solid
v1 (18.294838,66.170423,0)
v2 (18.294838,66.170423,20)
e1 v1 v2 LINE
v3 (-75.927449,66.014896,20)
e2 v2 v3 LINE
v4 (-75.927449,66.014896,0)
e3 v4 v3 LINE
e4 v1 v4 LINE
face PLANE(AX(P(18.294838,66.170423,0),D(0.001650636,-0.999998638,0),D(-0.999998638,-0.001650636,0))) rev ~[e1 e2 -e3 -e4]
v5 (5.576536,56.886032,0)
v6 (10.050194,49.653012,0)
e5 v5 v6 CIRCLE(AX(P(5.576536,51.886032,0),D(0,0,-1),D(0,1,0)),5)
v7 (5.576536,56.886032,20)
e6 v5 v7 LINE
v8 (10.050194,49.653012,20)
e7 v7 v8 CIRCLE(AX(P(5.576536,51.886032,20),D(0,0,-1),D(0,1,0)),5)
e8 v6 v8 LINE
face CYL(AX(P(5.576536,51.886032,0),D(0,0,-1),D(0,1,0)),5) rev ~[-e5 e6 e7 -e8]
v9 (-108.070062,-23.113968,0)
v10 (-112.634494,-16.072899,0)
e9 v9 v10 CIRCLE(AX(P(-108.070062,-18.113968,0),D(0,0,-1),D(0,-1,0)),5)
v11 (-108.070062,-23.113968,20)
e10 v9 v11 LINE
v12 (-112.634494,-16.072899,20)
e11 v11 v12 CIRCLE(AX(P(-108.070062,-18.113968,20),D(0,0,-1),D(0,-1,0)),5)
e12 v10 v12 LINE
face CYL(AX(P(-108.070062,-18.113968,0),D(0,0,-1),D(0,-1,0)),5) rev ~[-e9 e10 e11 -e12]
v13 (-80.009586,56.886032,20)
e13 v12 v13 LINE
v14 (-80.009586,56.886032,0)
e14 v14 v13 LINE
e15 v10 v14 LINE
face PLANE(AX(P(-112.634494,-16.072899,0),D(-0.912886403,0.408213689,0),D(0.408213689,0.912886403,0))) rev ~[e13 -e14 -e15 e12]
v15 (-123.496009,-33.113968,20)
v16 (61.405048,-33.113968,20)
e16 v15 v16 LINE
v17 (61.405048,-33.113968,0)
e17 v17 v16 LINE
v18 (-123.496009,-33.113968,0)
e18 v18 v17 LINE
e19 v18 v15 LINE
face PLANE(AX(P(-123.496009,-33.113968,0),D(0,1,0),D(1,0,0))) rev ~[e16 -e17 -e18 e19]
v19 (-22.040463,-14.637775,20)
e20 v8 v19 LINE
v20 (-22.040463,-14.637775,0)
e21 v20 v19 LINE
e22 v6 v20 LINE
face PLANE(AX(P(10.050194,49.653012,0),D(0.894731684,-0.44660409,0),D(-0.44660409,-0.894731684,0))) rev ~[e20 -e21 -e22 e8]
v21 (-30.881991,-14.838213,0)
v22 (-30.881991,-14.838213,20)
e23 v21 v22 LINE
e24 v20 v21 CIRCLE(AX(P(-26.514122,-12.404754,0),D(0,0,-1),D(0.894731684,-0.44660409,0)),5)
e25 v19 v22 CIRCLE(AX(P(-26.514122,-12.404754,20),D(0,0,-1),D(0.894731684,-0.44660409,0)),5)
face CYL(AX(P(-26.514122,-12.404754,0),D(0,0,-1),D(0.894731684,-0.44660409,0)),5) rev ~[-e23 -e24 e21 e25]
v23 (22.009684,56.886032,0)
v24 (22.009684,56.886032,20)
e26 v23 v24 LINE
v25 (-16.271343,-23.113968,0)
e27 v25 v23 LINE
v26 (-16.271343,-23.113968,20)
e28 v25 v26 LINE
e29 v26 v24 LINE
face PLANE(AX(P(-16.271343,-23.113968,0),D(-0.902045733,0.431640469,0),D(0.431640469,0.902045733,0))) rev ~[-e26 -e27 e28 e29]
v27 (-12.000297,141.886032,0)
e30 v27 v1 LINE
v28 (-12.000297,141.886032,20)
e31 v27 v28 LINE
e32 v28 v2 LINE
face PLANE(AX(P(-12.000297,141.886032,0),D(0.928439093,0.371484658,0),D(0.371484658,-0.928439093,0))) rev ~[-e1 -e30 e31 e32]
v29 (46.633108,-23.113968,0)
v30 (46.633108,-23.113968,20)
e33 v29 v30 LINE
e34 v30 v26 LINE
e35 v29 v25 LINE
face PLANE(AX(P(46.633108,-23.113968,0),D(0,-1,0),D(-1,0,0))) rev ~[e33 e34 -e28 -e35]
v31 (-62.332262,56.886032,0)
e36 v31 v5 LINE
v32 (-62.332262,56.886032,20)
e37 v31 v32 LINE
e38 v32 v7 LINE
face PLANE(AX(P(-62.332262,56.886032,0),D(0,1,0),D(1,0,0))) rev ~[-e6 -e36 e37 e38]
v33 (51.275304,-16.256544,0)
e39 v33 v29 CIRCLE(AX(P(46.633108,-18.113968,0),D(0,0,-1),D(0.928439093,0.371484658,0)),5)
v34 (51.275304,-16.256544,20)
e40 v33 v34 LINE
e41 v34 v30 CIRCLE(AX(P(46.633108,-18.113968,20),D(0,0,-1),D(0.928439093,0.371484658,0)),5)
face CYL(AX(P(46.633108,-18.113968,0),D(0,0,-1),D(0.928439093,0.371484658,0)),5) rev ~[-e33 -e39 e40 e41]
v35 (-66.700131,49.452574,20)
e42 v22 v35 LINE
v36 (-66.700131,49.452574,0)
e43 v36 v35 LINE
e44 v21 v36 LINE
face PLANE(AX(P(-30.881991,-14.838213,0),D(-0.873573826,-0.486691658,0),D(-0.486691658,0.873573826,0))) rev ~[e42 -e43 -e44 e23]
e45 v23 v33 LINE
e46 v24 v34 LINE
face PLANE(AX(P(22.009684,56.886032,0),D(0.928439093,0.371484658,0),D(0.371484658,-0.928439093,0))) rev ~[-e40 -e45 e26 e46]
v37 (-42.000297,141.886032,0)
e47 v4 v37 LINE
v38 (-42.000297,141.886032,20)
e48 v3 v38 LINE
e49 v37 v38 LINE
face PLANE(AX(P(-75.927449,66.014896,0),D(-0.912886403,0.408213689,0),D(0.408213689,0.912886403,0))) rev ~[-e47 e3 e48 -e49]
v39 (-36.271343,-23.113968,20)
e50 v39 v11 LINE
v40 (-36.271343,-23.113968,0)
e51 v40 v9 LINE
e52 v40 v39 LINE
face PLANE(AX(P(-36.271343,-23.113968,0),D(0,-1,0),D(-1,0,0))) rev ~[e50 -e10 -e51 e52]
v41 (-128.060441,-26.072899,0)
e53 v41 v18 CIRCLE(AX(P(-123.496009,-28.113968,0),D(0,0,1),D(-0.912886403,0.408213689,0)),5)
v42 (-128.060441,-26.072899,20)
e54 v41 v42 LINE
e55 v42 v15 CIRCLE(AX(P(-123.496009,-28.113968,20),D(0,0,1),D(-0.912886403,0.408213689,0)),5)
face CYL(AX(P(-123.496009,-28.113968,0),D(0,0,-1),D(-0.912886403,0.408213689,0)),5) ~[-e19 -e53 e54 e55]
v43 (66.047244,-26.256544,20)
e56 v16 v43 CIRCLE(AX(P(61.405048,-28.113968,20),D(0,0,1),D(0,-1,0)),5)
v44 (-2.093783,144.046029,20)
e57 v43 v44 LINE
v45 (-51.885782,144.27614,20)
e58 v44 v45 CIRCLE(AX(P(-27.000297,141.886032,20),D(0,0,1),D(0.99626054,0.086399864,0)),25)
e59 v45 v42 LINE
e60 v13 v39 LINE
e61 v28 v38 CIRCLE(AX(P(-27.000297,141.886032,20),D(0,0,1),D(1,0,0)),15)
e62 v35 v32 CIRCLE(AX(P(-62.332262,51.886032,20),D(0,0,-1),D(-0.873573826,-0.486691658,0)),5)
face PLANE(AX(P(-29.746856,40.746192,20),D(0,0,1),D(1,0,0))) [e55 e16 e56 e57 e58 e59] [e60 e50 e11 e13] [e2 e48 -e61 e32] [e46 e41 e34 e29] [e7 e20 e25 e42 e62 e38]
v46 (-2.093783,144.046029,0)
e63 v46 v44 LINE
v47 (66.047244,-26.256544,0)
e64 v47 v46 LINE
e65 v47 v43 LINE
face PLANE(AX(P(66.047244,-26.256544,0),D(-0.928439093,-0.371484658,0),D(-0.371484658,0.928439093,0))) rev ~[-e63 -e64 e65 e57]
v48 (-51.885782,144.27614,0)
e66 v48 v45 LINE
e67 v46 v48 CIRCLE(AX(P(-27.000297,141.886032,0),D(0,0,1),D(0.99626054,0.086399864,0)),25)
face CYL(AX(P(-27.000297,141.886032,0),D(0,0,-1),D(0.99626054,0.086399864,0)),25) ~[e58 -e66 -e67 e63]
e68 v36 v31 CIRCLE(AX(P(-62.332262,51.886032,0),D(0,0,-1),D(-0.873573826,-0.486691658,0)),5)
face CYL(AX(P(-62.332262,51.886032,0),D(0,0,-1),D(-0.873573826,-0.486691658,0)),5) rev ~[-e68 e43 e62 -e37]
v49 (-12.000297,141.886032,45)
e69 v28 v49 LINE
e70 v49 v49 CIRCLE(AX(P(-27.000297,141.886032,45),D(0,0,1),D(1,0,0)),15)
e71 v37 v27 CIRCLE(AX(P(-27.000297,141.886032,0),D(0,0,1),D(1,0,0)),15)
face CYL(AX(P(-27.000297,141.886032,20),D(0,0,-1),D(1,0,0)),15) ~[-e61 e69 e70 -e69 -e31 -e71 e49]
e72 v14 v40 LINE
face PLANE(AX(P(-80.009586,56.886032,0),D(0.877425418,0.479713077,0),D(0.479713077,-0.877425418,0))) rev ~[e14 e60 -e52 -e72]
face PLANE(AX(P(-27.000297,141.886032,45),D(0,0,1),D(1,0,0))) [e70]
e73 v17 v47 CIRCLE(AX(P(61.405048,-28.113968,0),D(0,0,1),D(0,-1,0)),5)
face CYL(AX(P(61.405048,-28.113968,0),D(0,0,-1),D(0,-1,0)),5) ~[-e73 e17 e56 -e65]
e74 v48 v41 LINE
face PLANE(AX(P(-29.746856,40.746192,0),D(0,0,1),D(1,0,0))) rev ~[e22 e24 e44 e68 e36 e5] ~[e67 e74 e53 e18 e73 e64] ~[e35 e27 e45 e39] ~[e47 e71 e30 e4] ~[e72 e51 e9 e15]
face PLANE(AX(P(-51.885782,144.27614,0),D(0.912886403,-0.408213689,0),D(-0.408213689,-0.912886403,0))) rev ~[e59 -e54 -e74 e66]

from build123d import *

# Parameters (mm, degrees)
F1_DEPTH = 20
F2_R     = 15
F3_DEPTH = 25


with BuildPart() as f1:
    # F0 (on Top) → F1 (new body)
    with BuildSketch(Plane.XY):
        with BuildLine():
            Line((66.0472436046, -26.2565443359), (-2.0937833608, 144.0460289628))
            ThreePointArc((-2.0937833608, 144.0460289628), (-26.8847617752, 166.8857654042), (-51.8857822677, 144.2761403347))
            Line((-51.8857822677, 144.2761403347), (-128.0604405721, -26.0728991835))
            ThreePointArc((-128.0604405721, -26.0728991835), (-127.6915622894, -30.833770725), (-123.4960085584, -33.1139676273))
            Line((-123.4960085584, -33.1139676273), (61.4050481416, -33.1139676273))
            ThreePointArc((61.4050481416, -33.1139676273), (65.5455261609, -30.9169021202), (66.0472436046, -26.2565443359))
        make_face()
        with BuildLine():
            Line((-36.2713433227, -23.1139676273), (-108.0700619725, -23.1139676273))
            ThreePointArc((-108.0700619725, -23.1139676273), (-112.2656157035, -20.833770725), (-112.6344939862, -16.0728991835))
            Line((-112.6344939862, -16.0728991835), (-80.009586342, 56.8860323727))
            Line((-80.009586342, 56.8860323727), (-75.9274494544, 66.0148964001))
            Line((-75.9274494544, 66.0148964001), (-42.0002968609, 141.8860323727))
            ThreePointArc((-42.0002968609, 141.8860323727), (-37.6068985787, 152.4926340905), (-27.0002968609, 156.8860323727))
            ThreePointArc((-27.0002968609, 156.8860323727), (-16.3936951431, 152.4926340905), (-12.0002968609, 141.8860323727))
            Line((-12.0002968609, 141.8860323727), (18.2948376146, 66.1704232987))
            Line((18.2948376146, 66.1704232987), (22.0096841973, 56.8860323727))
            Line((22.0096841973, 56.8860323727), (51.2753035904, -16.2565443359))
            ThreePointArc((51.2753035904, -16.2565443359), (50.7735861467, -20.9169021202), (46.6331081274, -23.1139676273))
            Line((46.6331081274, -23.1139676273), (-16.2713433227, -23.1139676273))
            Line((-16.2713433227, -23.1139676273), (-36.2713433227, -23.1139676273))
        make_face(mode=Mode.SUBTRACT)
        Polygon((-80.009586342, 56.8860323727), (-36.2713433227, -23.1139676273), (-16.2713433227, -23.1139676273), (22.0096841973, 56.8860323727), (18.2948376146, 66.1704232987), (-75.9274494544, 66.0148964001), align=None)
        with BuildLine():
            Line((-62.3322616112, 56.8860323727), (5.5765360215, 56.8860323727))
            ThreePointArc((5.5765360215, 56.8860323727), (9.8288943227, 54.5161367201), (10.0501944434, 49.6530119241))
            Line((10.0501944434, 49.6530119241), (-22.0404632685, -14.6377746762))
            ThreePointArc((-22.0404632685, -14.6377746762), (-26.4008005729, -17.403469895), (-30.8819908215, -14.8382125186))
            Line((-30.8819908215, -14.8382125186), (-66.7001307422, 49.4525740817))
            ThreePointArc((-66.7001307422, 49.4525740817), (-66.6431368968, 54.4190847355), (-62.3322616112, 56.8860323727))
        make_face(mode=Mode.SUBTRACT)
        with BuildLine():
            ThreePointArc((-27.0002968609, 156.8860323727), (-37.6068985787, 152.4926340905), (-42.0002968609, 141.8860323727))
            ThreePointArc((-42.0002968609, 141.8860323727), (-27.0002968609, 126.8860323727), (-12.0002968609, 141.8860323727))
            ThreePointArc((-12.0002968609, 141.8860323727), (-16.3936951431, 152.4926340905), (-27.0002968609, 156.8860323727))
        make_face()
    extrude(amount=F1_DEPTH)

    # F2 (on face) → F3 (join)
    with BuildSketch(Plane.XY.offset(20)):
        with Locations((-27.0002968609, 141.8860323727)):
            Circle(F2_R)
    extrude(amount=F3_DEPTH)


solid = f1.part
